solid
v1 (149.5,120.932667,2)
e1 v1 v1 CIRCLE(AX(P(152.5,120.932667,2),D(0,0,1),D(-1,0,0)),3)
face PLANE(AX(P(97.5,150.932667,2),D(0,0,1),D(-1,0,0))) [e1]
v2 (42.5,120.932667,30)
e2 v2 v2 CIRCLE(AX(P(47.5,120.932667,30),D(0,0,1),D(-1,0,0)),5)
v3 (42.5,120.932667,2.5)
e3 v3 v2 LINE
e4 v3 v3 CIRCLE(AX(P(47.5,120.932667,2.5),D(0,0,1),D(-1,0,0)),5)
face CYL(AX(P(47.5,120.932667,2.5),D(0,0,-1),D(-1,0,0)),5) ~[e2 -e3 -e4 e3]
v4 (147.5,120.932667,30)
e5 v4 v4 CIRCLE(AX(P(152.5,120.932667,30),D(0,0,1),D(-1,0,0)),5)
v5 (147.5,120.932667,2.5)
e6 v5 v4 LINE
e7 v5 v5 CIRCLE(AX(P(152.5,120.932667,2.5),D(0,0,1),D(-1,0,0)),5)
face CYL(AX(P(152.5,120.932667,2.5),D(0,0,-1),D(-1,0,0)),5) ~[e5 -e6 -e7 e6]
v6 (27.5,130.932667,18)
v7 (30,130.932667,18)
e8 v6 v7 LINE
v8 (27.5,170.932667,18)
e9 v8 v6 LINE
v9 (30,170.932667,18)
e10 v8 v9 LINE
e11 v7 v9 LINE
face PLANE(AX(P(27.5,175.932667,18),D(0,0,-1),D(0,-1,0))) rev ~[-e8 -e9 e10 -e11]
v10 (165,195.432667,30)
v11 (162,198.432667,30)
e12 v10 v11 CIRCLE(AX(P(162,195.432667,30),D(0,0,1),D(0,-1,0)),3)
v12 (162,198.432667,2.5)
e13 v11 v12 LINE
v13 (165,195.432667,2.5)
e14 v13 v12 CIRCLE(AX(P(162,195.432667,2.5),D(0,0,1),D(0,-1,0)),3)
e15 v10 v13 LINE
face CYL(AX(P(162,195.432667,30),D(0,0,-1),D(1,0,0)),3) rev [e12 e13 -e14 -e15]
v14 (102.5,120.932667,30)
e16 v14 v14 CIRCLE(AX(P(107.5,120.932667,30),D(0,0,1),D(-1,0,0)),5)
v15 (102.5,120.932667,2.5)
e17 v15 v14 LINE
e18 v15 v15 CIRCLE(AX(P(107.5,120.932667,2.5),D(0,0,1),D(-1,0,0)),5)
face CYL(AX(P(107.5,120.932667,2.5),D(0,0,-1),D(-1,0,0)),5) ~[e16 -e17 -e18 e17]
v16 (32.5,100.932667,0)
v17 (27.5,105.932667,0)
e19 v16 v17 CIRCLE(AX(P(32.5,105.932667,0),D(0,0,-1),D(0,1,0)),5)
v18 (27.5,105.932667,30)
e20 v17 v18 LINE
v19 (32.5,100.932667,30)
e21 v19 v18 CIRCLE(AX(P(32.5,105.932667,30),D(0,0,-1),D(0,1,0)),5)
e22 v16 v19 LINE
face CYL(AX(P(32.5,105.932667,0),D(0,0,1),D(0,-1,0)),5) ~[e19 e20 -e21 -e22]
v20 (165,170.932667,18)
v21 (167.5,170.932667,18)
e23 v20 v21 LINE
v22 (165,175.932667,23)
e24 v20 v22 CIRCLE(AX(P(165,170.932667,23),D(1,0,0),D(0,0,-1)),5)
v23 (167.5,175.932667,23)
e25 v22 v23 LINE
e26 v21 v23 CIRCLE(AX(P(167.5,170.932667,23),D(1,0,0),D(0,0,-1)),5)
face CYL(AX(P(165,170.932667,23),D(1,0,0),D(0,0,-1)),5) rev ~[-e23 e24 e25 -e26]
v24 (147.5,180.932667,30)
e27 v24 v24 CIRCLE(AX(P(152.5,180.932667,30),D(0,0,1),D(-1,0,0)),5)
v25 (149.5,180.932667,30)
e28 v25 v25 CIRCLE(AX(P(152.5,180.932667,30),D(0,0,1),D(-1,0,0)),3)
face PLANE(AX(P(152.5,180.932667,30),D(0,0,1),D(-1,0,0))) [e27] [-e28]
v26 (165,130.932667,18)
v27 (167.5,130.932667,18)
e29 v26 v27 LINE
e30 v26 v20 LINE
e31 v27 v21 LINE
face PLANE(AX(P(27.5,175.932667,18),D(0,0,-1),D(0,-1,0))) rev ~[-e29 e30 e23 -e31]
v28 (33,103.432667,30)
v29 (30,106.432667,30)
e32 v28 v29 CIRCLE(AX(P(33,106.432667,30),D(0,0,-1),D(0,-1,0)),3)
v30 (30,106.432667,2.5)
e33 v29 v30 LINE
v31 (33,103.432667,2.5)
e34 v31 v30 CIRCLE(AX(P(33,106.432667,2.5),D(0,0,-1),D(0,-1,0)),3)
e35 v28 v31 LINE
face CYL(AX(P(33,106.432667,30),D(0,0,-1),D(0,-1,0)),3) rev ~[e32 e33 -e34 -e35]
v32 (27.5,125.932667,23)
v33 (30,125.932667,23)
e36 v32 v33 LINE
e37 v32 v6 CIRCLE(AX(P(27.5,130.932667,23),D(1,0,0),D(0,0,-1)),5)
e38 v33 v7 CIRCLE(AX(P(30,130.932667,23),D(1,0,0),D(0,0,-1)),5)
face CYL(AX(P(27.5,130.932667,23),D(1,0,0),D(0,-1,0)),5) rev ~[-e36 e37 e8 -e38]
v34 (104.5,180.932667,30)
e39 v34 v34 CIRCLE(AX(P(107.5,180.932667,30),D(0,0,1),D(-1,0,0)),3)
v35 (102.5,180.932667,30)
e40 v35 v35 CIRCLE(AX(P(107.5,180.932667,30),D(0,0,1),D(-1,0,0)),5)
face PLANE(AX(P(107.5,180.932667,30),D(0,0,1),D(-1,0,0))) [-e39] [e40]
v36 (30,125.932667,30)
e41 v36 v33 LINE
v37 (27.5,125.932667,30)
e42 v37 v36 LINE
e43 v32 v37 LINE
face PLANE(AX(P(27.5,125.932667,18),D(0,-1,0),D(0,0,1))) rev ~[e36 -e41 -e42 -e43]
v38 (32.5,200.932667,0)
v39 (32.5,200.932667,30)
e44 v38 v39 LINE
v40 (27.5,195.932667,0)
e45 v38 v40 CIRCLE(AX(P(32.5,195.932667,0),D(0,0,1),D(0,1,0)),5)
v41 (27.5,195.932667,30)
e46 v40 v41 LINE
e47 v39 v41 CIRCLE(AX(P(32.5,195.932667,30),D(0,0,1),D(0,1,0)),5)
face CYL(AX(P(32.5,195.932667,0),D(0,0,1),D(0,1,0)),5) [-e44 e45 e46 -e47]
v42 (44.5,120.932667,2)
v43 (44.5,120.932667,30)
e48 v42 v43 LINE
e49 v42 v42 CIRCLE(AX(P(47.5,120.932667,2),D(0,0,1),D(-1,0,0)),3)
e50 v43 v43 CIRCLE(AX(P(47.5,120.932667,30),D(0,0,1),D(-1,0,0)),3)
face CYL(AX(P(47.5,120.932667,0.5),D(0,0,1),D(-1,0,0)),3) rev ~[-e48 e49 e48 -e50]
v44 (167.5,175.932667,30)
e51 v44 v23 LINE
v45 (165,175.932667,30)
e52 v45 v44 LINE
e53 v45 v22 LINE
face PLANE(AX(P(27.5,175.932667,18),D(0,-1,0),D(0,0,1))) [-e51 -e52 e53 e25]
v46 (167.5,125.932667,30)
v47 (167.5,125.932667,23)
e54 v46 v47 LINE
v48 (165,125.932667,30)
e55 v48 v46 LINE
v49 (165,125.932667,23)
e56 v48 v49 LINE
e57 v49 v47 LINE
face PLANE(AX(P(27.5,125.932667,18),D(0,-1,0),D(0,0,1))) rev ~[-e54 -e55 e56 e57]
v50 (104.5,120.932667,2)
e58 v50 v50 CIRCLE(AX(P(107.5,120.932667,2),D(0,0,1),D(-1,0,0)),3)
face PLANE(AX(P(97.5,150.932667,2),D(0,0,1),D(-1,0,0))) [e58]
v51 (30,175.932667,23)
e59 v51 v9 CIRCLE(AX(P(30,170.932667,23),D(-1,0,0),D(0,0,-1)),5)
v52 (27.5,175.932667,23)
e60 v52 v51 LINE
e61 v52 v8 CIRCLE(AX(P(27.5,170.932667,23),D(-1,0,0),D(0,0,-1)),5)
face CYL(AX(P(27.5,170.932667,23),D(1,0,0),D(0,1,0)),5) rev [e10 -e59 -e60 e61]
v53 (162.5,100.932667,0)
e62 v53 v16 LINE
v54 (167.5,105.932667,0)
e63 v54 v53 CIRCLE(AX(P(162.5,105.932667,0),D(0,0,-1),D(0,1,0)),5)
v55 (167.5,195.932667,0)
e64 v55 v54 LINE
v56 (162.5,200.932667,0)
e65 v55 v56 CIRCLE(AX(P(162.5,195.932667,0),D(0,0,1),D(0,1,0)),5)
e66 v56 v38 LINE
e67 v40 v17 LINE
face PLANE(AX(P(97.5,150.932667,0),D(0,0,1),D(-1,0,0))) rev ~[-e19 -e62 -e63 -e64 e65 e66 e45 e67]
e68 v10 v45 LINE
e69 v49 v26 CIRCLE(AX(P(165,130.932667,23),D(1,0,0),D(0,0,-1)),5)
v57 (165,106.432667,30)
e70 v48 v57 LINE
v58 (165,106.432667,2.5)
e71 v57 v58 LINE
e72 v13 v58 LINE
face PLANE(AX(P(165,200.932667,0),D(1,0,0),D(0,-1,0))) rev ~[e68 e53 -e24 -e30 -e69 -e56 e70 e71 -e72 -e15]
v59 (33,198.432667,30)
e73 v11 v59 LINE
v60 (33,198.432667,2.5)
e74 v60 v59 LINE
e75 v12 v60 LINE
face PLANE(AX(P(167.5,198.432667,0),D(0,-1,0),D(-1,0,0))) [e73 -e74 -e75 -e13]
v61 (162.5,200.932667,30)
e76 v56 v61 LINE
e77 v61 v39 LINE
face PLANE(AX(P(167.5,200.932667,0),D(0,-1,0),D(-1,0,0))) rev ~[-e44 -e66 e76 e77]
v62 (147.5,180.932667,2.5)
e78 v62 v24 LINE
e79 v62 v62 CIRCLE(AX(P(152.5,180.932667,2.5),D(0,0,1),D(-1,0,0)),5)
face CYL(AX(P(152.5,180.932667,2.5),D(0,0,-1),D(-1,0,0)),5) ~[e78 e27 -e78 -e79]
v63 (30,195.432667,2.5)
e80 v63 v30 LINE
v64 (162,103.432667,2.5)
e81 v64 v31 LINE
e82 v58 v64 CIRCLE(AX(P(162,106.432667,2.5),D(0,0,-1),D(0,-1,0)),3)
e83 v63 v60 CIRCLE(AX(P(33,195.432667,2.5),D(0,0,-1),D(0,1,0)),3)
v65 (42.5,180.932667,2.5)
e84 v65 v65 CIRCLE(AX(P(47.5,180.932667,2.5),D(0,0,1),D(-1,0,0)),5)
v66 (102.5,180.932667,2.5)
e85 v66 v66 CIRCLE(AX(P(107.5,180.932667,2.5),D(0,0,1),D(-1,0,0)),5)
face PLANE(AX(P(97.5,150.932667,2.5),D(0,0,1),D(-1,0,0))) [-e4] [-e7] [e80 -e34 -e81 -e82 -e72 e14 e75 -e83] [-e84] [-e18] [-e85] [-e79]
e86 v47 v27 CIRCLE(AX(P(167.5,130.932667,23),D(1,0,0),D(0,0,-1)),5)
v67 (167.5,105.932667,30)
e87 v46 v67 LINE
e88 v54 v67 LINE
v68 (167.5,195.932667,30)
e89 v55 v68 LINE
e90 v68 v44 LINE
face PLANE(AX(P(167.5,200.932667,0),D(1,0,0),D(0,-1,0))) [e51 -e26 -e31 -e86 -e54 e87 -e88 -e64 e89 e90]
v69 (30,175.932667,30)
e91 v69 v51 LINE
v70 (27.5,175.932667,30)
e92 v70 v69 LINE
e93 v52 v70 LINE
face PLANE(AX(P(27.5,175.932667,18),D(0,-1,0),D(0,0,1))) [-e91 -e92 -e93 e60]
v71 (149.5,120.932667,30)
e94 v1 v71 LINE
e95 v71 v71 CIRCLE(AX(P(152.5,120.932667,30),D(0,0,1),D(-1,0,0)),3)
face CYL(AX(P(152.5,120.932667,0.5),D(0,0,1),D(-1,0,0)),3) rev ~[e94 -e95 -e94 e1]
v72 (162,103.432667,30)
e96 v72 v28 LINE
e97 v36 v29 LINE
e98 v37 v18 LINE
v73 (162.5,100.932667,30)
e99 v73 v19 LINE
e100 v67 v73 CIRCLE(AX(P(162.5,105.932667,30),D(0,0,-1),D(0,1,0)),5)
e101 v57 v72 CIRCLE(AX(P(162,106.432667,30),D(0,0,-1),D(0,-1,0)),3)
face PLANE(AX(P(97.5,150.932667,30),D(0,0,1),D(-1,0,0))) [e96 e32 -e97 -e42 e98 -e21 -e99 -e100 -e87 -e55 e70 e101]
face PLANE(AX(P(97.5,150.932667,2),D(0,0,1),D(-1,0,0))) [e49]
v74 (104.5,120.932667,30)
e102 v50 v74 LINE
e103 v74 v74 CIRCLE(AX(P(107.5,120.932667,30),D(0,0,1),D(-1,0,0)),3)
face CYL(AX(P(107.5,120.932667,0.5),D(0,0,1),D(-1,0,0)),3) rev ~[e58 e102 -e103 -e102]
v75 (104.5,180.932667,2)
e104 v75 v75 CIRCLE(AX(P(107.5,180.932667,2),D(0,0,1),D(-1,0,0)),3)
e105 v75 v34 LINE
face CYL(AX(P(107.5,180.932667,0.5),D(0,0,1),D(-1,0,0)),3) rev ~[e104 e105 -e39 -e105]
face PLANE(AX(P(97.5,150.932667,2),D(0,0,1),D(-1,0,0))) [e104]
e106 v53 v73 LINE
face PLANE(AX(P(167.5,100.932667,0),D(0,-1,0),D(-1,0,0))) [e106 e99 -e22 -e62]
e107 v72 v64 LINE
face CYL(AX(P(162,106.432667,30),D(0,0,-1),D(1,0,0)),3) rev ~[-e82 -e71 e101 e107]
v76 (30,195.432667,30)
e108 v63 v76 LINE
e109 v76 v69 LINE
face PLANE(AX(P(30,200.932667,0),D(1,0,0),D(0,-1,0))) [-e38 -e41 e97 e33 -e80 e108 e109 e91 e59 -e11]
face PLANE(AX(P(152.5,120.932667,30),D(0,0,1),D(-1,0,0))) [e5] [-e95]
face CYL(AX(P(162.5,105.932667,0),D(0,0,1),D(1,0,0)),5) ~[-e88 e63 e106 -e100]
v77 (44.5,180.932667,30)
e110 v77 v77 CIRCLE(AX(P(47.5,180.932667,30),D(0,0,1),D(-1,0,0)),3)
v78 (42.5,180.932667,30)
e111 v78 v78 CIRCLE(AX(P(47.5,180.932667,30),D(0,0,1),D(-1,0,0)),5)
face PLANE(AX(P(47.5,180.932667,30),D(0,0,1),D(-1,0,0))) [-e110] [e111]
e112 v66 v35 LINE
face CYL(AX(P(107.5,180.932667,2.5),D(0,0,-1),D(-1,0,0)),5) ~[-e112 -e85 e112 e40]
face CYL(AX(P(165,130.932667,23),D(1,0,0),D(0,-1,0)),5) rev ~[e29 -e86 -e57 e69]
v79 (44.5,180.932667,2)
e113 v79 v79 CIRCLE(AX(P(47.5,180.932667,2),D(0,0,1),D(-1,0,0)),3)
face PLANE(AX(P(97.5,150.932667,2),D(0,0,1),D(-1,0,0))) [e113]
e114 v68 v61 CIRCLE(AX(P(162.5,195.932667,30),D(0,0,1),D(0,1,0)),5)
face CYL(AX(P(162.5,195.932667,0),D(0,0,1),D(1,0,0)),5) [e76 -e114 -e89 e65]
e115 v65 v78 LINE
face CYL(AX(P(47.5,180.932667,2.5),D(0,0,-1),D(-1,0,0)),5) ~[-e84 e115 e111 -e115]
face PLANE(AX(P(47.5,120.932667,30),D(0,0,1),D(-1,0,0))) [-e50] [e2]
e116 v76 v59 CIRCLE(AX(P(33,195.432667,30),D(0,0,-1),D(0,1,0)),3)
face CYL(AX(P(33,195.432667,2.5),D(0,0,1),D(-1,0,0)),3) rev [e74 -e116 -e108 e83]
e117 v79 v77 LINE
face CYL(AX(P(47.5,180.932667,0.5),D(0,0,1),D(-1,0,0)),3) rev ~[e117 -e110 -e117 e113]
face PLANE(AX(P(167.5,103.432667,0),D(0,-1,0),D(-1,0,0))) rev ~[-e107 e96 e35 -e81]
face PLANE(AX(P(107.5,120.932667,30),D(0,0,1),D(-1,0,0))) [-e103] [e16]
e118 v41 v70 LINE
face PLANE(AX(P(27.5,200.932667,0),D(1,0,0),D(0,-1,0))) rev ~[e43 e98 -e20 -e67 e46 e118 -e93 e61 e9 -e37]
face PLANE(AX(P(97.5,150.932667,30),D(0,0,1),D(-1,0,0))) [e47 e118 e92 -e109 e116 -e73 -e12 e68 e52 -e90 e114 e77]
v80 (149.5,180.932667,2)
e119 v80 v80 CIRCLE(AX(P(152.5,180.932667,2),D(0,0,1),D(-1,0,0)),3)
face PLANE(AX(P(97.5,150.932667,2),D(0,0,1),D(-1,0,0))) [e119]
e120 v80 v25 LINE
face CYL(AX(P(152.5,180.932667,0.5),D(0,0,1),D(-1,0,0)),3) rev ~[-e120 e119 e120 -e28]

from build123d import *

# Parameters (mm, degrees)
F0_W          = 140
F0_H          = 100
F1_DEPTH      = 30
F2_T          = -2.5
F3_W          = 50
F3_H          = 12
F4_DEPTH      = 205.5
F5_R          = 5
F6_R          = 5
F7_R          = 3
F8_R          = 5
F9_DEPTH      = 27.5
F10_T         = 2
F10_T3_DEPTH  = 93
F10_T5_DEPTH  = 133
F10_T8_ANGLE  = 90.000000001
F10_T10_ANGLE = 90.000000001
F10_T12_ANGLE = 90.000000001
F10_T14_ANGLE = 90.000000001
F11_ANGLE     = 60
F12_ANGLE     = 30
F13_ANGLE     = 90


# Not quite as in the source:
# - a shell that OpenCascade refuses in one call is made with other operations: the cavity is built on its own and cut out


with BuildPart() as f1:
    # F0 (on Top) → F1 (new body)
    with BuildSketch(Plane.XY):
        with Locations((50, 0)):
            Rectangle(F0_W, F0_H)
    extrude(amount=F1_DEPTH)

    # F2
    f2_openings = [f1.faces().sort_by_distance(p)[0] for p in [
        (50, 0, 30),
    ]]
    offset(amount=F2_T, openings=f2_openings)

    # F3 (on face) → F4 (cut)
    with BuildSketch(Plane.YZ.offset(120)):
        with Locations((0, 24)):
            Rectangle(F3_W, F3_H)
    extrude(amount=-F4_DEPTH, mode=Mode.SUBTRACT)

    # F5
    f5_edges = [f1.edges().sort_by_distance(p)[0] for p in [
        (-18.75, 25, 18),
        (-18.75, -25, 18),
        (118.75, -25, 18),
        (118.75, 25, 18),
    ]]
    fillet(f5_edges, radius=F5_R)

    # F6
    f6_edges = [f1.edges().sort_by_distance(p)[0] for p in [
        (120, 50, 15),
        (-20, 50, 15),
        (-20, -50, 15),
        (120, -50, 15),
    ]]
    fillet(f6_edges, radius=F6_R)

    # F7
    f7_edges = [f1.edges().sort_by_distance(p)[0] for p in [
        (-17.5, -47.5, 16.25),
        (-17.5, 47.5, 16.25),
        (117.5, 47.5, 16.25),
        (117.5, -47.5, 16.25),
    ]]
    fillet(f7_edges, radius=F7_R)

    # F8 (on face) → F9 (join, through all)
    with BuildSketch(Plane.XY.offset(2.5)):
        with Locations((-5, -30)):
            Circle(F8_R)
        with Locations((40, -30)):
            Circle(F8_R)
        with Locations((100, -30)):
            Circle(F8_R)
        with Locations((100, 30)):
            Circle(F8_R)
        with Locations((40, 30)):
            Circle(F8_R)
        with Locations((-5, 30)):
            Circle(F8_R)
    extrude(amount=F9_DEPTH)

    # F10: shell of thickness 2, made by hand


with BuildPart() as f10_core1:
    # F10_t2: copy of F1
    add(f1.part)

    # the walls: a layer under each face that stays
    f10_faces = [f10_core1.faces().sort_by_distance(p)[0] for p in [
        (-10, -48.2142857143, 30),
        (117.5, 0, 16.25),
        (116.6213203436, -46.6213203436, 16.25),
        (118.75, -25, 26.5),
        (50, -47.5, 16.25),
        (120, 0, 15),
        (-16.6213203436, -46.6213203436, 16.25),
        (118.5355339059, -48.5355339059, 15),
        (-17.5, 0, 16.25),
        (50, -50, 15),
        (-18.75, -25, 26.5),
        (-18.5355339059, -48.5355339059, 15),
        (-20, 0, 15),
        (-10, 48.2142857143, 30),
        (116.6213203436, 46.6213203436, 16.25),
        (118.75, 25, 26.5),
        (50, 0, 2.5),
        (118.75, 23.5355339059, 19.4644660941),
        (118.75, 0, 18),
        (118.75, -23.5355339059, 19.4644660941),
        (118.5355339059, 48.5355339059, 15),
        (50, 0, 0),
        (-18.75, -23.5355339059, 19.4644660941),
        (-16.6213203436, 46.6213203436, 16.25),
        (-18.75, 0, 18),
        (-18.75, 23.5355339059, 19.4644660941),
        (-18.75, 25, 26.5),
        (-18.5355339059, 48.5355339059, 15),
        (50, 47.5, 16.25),
        (50, 50, 15),
        (-10, -30, 16.25),
        (35, -30, 16.25),
        (95, -30, 16.25),
        (-10, 30, 16.25),
        (35, 30, 16.25),
        (95, 30, 16.25),
    ]]
    thicken(f10_faces, amount=-F10_T, mode=Mode.SUBTRACT)

    # F10_s4 → F10_t3 (cut)
    with BuildSketch(Plane.XZ.offset(-46.5)):
        Polygon((117.48, 2.52), (119.5, 2.5), (119.5, 0.5), (117.5, 0.5), align=None)
        Polygon((-17.48, 2.52), (-19.5, 2.5), (-19.5, 0.5), (-17.5, 0.5), align=None)
    extrude(amount=F10_T3_DEPTH, mode=Mode.SUBTRACT)

    # F10_s6 → F10_t5 (cut)
    with BuildSketch(Plane.YZ.offset(-16.5)):
        Polygon((-47.48, 2.52), (-49.5, 2.5), (-49.5, 0.5), (-47.5, 0.5), align=None)
        Polygon((47.48, 2.52), (47.5, 0.5), (49.5, 0.5), (49.5, 2.5), align=None)
    extrude(amount=F10_T5_DEPTH, mode=Mode.SUBTRACT)

    # F10_s7 → F10_t8 (revolve, cut)
    with BuildSketch(Plane.XZ.offset(44.5)):
        Polygon((117.48, 2.52), (119.5, 2.5), (119.5, 0.5), (117.5, 0.5), align=None)
    revolve(axis=Axis((114.5, -44.5, 2.5), (0, 0, -1)), revolution_arc=F10_T8_ANGLE, mode=Mode.SUBTRACT)

    # F10_s9 → F10_t10 (revolve, cut)
    with BuildSketch(Plane.YZ.offset(-14.5)):
        Polygon((-47.48, 2.52), (-49.5, 2.5), (-49.5, 0.5), (-47.5, 0.5), align=None)
    revolve(axis=Axis((-14.5, -44.5, 2.5), (0, 0, -1)), revolution_arc=F10_T10_ANGLE, mode=Mode.SUBTRACT)

    # F10_s11 → F10_t12 (revolve, cut)
    with BuildSketch(Plane.XZ.offset(-44.5)):
        Polygon((117.48, 2.52), (119.5, 2.5), (119.5, 0.5), (117.5, 0.5), align=None)
    revolve(axis=Axis((114.5, 44.5, 2.5), (0, 0, 1)), revolution_arc=F10_T12_ANGLE, mode=Mode.SUBTRACT)

    # F10_s13 → F10_t14 (revolve, cut)
    with BuildSketch(Plane.XZ.offset(-44.5)):
        Polygon((-17.48, 2.52), (-17.5, 0.5), (-19.5, 0.5), (-19.5, 2.5), align=None)
    revolve(axis=Axis((-14.5, 44.5, 2.5), (0, 0, -1)), revolution_arc=F10_T14_ANGLE, mode=Mode.SUBTRACT)

    # F10_s15 → F10_t16 (revolve, cut)
    with BuildSketch(Plane.XZ.offset(30)):
        Polygon((0.02, 2.52), (0, 0.5), (-2, 0.5), (-2, 2.5), align=None)
    revolve(axis=Axis((-5, -30, 2.5), (0, 0, 1)), mode=Mode.SUBTRACT)

    # F10_s17 → F10_t18 (revolve, cut)
    with BuildSketch(Plane.XZ.offset(30)):
        Polygon((45.02, 2.52), (45, 0.5), (43, 0.5), (43, 2.5), align=None)
    revolve(axis=Axis((40, -30, 2.5), (0, 0, 1)), mode=Mode.SUBTRACT)

    # F10_s19 → F10_t20 (revolve, cut)
    with BuildSketch(Plane.XZ.offset(30)):
        Polygon((105.02, 2.52), (105, 0.5), (103, 0.5), (103, 2.5), align=None)
    revolve(axis=Axis((100, -30, 2.5), (0, 0, 1)), mode=Mode.SUBTRACT)

    # F10_s21 → F10_t22 (revolve, cut)
    with BuildSketch(Plane.XZ.offset(-30)):
        Polygon((0.02, 2.52), (0, 0.5), (-2, 0.5), (-2, 2.5), align=None)
    revolve(axis=Axis((-5, 30, 2.5), (0, 0, 1)), mode=Mode.SUBTRACT)

    # F10_s23 → F10_t24 (revolve, cut)
    with BuildSketch(Plane.XZ.offset(-30)):
        Polygon((45.02, 2.52), (45, 0.5), (43, 0.5), (43, 2.5), align=None)
    revolve(axis=Axis((40, 30, 2.5), (0, 0, 1)), mode=Mode.SUBTRACT)

    # F10_s25 → F10_t26 (revolve, cut)
    with BuildSketch(Plane.XZ.offset(-30)):
        Polygon((105.02, 2.52), (105, 0.5), (103, 0.5), (103, 2.5), align=None)
    revolve(axis=Axis((100, 30, 2.5), (0, 0, 1)), mode=Mode.SUBTRACT)


with BuildPart() as f1_1:
    add(f1.part)

    # what is left inside the walls is the cavity
    f10_cavity = [f10_core1.part.solids().sort_by_distance(p)[0] for p in [
        (-7.98, -30, 11.333333),
        (37.02, -30, 11.333333),
        (97.02, -30, 11.333333),
        (-7.98, 30, 11.333333),
        (37.02, 30, 11.333333),
        (97.02, 30, 11.333333),
    ]]
    add(f10_cavity, mode=Mode.SUBTRACT)


with BuildPart() as f1_2:
    # F11: moved
    add(f1_1.part.rotate(Axis((-5, 30, 2), (0, 0, 1)), F11_ANGLE))


with BuildPart() as f1_3:
    # F12: moved
    add(f1_2.part.rotate(Axis((47.5, 120.9326673974, 0.5), (0, 0, 1)), F12_ANGLE))


with BuildPart() as f1_4:
    # F13: moved
    add(f1_3.part.rotate(Axis((47.5, 120.9326673974, 0.5), (0, 0, 1)), F13_ANGLE))


solid = f1_4.part
